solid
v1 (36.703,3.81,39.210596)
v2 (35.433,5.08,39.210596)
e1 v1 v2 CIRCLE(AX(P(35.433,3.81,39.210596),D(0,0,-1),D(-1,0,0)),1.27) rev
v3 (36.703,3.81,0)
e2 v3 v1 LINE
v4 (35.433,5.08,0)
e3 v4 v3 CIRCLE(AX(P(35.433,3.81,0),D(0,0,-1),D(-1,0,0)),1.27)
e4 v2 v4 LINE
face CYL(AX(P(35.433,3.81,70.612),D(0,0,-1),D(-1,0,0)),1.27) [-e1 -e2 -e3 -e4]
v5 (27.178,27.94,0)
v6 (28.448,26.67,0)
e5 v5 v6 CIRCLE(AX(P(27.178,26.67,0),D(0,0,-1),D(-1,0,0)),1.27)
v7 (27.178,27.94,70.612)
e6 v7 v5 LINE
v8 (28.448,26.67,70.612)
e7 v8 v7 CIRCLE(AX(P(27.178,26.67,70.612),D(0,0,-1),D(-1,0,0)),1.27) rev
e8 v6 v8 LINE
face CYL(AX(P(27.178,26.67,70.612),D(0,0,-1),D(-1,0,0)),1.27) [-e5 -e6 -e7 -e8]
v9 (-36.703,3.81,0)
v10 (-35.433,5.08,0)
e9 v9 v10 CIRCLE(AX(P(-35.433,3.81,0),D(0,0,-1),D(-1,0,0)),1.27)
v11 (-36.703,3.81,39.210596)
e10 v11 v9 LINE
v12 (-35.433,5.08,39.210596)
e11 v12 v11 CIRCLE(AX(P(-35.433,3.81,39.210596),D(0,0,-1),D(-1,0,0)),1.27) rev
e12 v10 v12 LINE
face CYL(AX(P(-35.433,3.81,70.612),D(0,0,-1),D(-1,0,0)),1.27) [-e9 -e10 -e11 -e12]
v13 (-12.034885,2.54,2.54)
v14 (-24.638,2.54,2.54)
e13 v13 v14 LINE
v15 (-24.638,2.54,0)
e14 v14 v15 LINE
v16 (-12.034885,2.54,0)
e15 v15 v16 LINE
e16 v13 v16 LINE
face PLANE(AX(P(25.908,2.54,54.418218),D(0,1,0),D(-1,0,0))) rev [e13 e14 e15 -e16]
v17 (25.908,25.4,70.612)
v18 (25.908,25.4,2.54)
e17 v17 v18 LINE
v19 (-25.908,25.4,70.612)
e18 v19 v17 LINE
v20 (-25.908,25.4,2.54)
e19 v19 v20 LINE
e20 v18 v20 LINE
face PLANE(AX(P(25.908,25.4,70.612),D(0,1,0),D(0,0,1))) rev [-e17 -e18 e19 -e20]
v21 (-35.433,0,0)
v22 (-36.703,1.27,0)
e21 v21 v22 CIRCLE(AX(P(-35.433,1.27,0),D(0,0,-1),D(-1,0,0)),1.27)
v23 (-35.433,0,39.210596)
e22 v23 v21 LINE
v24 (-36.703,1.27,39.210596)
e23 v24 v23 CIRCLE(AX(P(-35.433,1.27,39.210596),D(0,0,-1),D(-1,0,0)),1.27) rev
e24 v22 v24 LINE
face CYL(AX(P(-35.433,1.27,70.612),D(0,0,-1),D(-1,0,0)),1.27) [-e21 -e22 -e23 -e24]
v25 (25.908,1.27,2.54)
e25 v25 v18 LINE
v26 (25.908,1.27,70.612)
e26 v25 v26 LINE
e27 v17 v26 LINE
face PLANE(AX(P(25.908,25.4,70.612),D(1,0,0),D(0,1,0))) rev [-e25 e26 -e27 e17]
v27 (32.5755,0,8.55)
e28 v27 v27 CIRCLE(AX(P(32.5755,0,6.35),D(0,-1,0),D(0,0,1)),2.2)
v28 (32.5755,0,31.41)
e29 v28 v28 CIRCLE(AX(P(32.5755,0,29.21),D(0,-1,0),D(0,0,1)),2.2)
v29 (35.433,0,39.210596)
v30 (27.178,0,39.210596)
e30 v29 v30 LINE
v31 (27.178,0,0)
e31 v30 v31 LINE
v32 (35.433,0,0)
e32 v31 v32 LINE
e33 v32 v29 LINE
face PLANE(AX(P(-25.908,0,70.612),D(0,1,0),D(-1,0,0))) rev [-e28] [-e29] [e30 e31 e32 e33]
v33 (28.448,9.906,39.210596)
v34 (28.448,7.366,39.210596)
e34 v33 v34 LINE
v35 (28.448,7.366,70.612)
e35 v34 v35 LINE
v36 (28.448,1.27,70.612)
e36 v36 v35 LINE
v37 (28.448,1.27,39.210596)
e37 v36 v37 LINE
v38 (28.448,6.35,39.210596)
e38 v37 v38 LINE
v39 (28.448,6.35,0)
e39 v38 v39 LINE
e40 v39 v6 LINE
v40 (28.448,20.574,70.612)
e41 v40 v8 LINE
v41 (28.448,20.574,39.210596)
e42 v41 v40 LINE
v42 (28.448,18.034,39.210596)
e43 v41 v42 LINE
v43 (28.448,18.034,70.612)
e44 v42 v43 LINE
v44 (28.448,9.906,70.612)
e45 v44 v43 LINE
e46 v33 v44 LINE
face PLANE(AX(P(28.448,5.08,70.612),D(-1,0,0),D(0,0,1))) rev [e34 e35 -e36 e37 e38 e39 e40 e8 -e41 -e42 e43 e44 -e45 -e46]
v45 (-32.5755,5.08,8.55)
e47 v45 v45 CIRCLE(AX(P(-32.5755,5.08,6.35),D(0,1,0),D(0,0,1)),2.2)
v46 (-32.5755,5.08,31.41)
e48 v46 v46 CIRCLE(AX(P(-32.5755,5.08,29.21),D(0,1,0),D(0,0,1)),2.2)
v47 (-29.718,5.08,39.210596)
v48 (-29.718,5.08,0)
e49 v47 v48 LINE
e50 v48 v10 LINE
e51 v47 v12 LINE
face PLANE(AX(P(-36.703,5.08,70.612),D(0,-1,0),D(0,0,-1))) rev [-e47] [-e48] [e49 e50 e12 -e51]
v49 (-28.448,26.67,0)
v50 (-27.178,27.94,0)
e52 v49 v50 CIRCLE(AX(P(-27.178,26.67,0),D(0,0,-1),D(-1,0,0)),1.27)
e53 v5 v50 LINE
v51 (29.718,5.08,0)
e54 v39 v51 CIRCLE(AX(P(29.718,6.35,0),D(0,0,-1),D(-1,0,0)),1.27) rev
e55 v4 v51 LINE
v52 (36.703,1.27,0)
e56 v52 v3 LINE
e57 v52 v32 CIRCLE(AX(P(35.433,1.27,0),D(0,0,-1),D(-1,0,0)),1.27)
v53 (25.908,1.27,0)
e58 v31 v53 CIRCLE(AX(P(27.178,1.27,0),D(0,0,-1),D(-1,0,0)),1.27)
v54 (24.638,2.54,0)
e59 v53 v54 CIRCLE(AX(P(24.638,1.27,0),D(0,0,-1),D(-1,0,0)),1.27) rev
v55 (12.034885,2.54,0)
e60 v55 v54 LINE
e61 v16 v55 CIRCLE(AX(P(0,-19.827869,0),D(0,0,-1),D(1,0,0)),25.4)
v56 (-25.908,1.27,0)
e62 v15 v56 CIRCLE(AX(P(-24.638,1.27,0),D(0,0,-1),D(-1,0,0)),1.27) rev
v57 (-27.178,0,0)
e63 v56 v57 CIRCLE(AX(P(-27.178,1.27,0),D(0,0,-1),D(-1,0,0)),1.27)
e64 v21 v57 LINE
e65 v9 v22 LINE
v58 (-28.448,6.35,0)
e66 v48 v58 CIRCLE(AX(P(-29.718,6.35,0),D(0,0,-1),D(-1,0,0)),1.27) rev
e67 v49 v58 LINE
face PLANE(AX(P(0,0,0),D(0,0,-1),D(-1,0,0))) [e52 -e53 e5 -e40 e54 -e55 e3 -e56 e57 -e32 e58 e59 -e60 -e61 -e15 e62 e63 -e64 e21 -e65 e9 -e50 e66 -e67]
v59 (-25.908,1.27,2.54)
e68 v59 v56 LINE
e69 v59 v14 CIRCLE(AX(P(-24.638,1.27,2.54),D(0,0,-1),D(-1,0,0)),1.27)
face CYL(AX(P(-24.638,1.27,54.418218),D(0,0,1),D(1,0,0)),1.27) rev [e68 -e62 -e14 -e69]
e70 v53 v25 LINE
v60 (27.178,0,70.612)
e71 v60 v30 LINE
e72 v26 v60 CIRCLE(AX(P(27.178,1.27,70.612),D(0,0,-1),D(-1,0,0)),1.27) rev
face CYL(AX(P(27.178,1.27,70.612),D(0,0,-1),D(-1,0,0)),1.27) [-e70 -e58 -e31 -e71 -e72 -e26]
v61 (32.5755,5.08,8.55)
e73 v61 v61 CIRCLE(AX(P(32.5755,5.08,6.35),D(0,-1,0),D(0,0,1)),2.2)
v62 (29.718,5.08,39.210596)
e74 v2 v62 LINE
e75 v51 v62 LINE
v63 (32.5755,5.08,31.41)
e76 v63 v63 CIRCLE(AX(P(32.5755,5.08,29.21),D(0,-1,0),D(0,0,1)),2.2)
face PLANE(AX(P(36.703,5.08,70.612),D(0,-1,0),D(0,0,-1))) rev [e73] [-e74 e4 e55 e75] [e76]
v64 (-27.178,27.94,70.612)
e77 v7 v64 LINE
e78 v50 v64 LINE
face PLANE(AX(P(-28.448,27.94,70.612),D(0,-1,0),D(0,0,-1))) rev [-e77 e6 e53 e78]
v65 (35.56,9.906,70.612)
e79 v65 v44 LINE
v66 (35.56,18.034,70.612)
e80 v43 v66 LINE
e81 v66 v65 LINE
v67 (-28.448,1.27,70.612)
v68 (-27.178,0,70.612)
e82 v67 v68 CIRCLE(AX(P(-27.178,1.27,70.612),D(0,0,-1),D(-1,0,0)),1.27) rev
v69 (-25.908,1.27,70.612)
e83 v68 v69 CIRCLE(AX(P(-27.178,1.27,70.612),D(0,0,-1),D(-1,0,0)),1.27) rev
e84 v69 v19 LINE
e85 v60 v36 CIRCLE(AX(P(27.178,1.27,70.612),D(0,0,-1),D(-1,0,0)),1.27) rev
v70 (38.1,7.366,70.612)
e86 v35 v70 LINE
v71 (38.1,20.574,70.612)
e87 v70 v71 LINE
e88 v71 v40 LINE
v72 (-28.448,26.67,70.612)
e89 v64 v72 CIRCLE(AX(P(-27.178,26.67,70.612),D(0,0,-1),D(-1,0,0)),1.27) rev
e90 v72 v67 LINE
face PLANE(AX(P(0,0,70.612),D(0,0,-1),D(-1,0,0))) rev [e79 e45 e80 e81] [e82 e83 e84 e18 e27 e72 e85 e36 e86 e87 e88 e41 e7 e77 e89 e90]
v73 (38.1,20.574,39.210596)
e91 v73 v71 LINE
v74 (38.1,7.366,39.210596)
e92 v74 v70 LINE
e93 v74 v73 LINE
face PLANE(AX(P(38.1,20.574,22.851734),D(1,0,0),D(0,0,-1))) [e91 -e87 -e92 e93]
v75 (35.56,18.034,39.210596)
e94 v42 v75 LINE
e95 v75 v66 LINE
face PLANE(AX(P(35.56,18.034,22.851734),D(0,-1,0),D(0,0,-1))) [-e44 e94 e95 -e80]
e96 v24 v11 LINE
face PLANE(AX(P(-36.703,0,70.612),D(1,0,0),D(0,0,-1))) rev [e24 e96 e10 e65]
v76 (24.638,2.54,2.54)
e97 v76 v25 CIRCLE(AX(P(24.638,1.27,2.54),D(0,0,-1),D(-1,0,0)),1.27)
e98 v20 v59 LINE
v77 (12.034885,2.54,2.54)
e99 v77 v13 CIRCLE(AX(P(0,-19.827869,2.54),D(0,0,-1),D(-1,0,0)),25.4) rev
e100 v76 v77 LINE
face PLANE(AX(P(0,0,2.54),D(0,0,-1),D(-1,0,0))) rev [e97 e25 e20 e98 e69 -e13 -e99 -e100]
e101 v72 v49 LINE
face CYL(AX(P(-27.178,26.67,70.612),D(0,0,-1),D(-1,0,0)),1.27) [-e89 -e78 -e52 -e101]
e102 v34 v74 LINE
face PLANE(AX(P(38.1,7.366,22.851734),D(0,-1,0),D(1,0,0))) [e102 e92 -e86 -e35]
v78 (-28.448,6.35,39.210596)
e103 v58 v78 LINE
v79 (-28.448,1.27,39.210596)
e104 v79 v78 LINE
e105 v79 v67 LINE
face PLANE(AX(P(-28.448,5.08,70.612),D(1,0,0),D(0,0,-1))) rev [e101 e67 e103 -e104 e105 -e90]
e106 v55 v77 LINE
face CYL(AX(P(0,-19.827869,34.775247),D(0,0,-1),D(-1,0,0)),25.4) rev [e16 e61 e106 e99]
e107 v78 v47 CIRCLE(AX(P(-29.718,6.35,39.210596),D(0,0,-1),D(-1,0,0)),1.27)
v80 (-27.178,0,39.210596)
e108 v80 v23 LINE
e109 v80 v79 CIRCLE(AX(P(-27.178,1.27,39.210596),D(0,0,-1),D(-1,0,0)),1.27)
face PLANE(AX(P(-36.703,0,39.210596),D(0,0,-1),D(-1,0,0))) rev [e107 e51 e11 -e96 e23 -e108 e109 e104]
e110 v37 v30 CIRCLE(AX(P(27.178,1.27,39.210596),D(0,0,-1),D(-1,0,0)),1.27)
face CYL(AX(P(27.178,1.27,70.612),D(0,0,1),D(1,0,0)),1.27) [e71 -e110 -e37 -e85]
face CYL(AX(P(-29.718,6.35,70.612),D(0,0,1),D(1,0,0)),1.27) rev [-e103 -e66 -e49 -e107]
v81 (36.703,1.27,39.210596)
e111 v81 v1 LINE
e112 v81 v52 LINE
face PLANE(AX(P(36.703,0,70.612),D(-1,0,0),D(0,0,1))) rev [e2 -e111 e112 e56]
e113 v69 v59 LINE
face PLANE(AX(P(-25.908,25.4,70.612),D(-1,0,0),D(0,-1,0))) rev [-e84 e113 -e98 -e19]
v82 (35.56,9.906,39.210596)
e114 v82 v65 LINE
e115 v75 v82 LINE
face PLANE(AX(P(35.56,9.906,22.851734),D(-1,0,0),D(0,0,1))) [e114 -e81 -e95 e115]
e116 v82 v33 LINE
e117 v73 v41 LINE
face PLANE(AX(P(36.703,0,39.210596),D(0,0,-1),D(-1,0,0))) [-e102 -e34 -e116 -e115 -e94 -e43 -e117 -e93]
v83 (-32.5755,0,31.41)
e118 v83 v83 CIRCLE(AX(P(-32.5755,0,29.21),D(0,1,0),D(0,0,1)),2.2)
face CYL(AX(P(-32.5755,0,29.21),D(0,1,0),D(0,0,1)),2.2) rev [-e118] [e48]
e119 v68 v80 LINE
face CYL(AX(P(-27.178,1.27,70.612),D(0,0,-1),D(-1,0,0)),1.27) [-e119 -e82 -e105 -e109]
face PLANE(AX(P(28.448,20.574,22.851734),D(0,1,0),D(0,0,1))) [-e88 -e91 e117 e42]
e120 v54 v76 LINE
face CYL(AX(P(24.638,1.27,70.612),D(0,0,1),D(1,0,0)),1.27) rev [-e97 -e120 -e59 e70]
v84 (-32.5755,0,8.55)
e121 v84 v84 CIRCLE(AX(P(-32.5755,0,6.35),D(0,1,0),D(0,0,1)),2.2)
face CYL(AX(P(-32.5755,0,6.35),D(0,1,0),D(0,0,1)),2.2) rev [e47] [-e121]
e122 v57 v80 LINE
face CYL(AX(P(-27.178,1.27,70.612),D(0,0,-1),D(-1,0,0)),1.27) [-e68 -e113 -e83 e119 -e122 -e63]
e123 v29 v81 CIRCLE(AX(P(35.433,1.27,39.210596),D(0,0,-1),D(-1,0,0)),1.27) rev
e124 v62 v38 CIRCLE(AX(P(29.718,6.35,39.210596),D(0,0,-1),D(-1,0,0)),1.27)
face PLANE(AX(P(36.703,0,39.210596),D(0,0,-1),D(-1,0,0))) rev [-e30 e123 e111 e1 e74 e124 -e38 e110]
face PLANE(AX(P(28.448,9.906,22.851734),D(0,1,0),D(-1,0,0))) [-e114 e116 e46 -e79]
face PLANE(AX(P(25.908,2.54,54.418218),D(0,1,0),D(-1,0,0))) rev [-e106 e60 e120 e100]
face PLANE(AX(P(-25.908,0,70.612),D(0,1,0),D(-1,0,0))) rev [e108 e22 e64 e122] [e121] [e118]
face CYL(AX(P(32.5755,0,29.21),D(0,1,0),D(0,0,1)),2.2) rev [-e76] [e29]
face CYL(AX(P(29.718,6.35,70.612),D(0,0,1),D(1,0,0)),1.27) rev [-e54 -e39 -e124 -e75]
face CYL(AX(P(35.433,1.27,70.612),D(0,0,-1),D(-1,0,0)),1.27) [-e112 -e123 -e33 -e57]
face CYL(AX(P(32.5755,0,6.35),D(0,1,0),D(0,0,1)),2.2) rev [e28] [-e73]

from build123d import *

# Parameters (mm, degrees)
BOSS_EXTRUDE1_DEPTH = 70.612
SKETCH2_R           = 2.2
CUT_EXTRUDE1_DEPTH  = 83.799422419
SKETCH3_W           = 8.255
SKETCH3_H           = 31.401404102
CUT_EXTRUDE2_DEPTH  = 83.799422419
BOSS_EXTRUDE3_DEPTH = 2.54
CUT_EXTRUDE6_DEPTH  = 2.54
SKETCH9_W           = 51.816
SKETCH9_H           = 2.54
CUT_EXTRUDE7_DEPTH  = 2.54
FILLET1_R           = 1.27
FILLET2_R           = 1.27
BOSS_EXTRUDE4_DEPTH = 31.401404102


with BuildPart() as part:
    # Sketch1 → Boss-Extrude1 (new body)
    with BuildSketch(Plane.XY):
        Polygon((25.908, 25.4), (-25.908, 25.4), (-25.908, 0), (-36.703, 0), (-36.703, 5.08), (-28.448, 5.08), (-28.448, 27.94), (28.448, 27.94), (28.448, 5.08), (36.703, 5.08), (36.703, 0), (25.908, 0), align=None)
    extrude(amount=BOSS_EXTRUDE1_DEPTH)

    # Sketch2 → Cut-Extrude1 (cut, through all)
    with BuildSketch(Plane(origin=(0, 5.08, 0), x_dir=(1, 0, 0), z_dir=(0, 1, 0))):
        with Locations(Location((-32.5755, -6.35, 0), (0, 0, 270))):
            Circle(SKETCH2_R)
        with Locations(Location((-32.5755, -29.21, 0), (0, 0, 270))):
            Circle(SKETCH2_R)
    cut_extrude1 = extrude(amount=-CUT_EXTRUDE1_DEPTH, mode=Mode.SUBTRACT)

    # Mirror1: Cut-Extrude1 across plane
    add(cut_extrude1.mirror(Plane(origin=(0, 0, 0), x_dir=(0, 0, 1), z_dir=(1, 0, 0))), mode=Mode.SUBTRACT)

    # Sketch3 → Cut-Extrude2 (cut, through all)
    with BuildSketch(Plane(origin=(0, 5.08, 0), x_dir=(1, 0, 0), z_dir=(0, 1, 0))):
        with Locations((-32.5755, -54.911297949)):
            Rectangle(SKETCH3_W, SKETCH3_H)
        with Locations((32.5755, -54.911297949)):
            Rectangle(SKETCH3_W, SKETCH3_H)
    extrude(amount=-CUT_EXTRUDE2_DEPTH, mode=Mode.SUBTRACT)

    # Sketch6 → Boss-Extrude3 (add)
    with BuildSketch(Plane(origin=(0, 0, 0), x_dir=(-1, 0, 0), z_dir=(0, 0, -1))):
        Polygon((-25.908, 0), (25.908, 0), (36.703, 0), (36.703, 5.08), (28.448, 5.08), (28.448, 27.94), (-28.448, 27.94), (-28.448, 5.08), (-36.703, 5.08), (-36.703, 0), align=None)
    extrude(amount=-BOSS_EXTRUDE3_DEPTH)

    # Sketch8 → Cut-Extrude6 (cut)
    with BuildSketch(Plane(origin=(0, 0, 0), x_dir=(-1, 0, 0), z_dir=(0, 0, -1))):
        with BuildLine():
            Line((-15.875, 0), (15.875, 0))
            ThreePointArc((15.875, 0), (0, 5.572131355), (-15.875, 0))
        make_face()
    extrude(amount=-CUT_EXTRUDE6_DEPTH, mode=Mode.SUBTRACT)

    # Sketch9 → Cut-Extrude7 (cut)
    with BuildSketch(Plane(origin=(0, 0, 0), x_dir=(-1, 0, 0), z_dir=(0, 0, -1))):
        with Locations((0, 1.27)):
            Rectangle(SKETCH9_W, SKETCH9_H)
    extrude(amount=-CUT_EXTRUDE7_DEPTH, mode=Mode.SUBTRACT)

    # Fillet1
    fillet1_edges = [part.edges().sort_by_distance(p)[0] for p in [
        (-28.448, 5.08, 19.605297949),
        (28.448, 5.08, 19.605297949),
        (36.703, 0, 19.605297949),
        (36.703, 5.08, 19.605297949),
        (-36.703, 5.08, 19.605297949),
        (-36.703, 0, 19.605297949),
        (28.448, 0, 54.911297949),
        (25.908, 0, 35.306),
        (-25.908, 0, 35.306),
        (-28.448, 0, 54.911297949),
        (28.448, 27.94, 35.306),
        (-28.448, 27.94, 35.306),
    ]]
    fillet(fillet1_edges, radius=FILLET1_R - 0.0001)  # a hair under: the kernel refuses the full size

    # Fillet2
    fillet2_edges = [part.edges().sort_by_distance(p)[0] for p in [
        (-25.908, 2.54, 1.27),
        (25.908, 2.54, 1.27),
    ]]
    fillet(fillet2_edges, radius=FILLET2_R)

    # Sketch10 → Boss-Extrude4 (add)
    with BuildSketch(Plane.XY.offset(70.612)):
        Polygon((28.448, 20.574), (38.1, 20.574), (38.1, 7.366), (28.448, 7.366), (28.448, 9.906), (35.56, 9.906), (35.56, 18.034), (28.448, 18.034), align=None)
    extrude(amount=-BOSS_EXTRUDE4_DEPTH)


solid = part.part
